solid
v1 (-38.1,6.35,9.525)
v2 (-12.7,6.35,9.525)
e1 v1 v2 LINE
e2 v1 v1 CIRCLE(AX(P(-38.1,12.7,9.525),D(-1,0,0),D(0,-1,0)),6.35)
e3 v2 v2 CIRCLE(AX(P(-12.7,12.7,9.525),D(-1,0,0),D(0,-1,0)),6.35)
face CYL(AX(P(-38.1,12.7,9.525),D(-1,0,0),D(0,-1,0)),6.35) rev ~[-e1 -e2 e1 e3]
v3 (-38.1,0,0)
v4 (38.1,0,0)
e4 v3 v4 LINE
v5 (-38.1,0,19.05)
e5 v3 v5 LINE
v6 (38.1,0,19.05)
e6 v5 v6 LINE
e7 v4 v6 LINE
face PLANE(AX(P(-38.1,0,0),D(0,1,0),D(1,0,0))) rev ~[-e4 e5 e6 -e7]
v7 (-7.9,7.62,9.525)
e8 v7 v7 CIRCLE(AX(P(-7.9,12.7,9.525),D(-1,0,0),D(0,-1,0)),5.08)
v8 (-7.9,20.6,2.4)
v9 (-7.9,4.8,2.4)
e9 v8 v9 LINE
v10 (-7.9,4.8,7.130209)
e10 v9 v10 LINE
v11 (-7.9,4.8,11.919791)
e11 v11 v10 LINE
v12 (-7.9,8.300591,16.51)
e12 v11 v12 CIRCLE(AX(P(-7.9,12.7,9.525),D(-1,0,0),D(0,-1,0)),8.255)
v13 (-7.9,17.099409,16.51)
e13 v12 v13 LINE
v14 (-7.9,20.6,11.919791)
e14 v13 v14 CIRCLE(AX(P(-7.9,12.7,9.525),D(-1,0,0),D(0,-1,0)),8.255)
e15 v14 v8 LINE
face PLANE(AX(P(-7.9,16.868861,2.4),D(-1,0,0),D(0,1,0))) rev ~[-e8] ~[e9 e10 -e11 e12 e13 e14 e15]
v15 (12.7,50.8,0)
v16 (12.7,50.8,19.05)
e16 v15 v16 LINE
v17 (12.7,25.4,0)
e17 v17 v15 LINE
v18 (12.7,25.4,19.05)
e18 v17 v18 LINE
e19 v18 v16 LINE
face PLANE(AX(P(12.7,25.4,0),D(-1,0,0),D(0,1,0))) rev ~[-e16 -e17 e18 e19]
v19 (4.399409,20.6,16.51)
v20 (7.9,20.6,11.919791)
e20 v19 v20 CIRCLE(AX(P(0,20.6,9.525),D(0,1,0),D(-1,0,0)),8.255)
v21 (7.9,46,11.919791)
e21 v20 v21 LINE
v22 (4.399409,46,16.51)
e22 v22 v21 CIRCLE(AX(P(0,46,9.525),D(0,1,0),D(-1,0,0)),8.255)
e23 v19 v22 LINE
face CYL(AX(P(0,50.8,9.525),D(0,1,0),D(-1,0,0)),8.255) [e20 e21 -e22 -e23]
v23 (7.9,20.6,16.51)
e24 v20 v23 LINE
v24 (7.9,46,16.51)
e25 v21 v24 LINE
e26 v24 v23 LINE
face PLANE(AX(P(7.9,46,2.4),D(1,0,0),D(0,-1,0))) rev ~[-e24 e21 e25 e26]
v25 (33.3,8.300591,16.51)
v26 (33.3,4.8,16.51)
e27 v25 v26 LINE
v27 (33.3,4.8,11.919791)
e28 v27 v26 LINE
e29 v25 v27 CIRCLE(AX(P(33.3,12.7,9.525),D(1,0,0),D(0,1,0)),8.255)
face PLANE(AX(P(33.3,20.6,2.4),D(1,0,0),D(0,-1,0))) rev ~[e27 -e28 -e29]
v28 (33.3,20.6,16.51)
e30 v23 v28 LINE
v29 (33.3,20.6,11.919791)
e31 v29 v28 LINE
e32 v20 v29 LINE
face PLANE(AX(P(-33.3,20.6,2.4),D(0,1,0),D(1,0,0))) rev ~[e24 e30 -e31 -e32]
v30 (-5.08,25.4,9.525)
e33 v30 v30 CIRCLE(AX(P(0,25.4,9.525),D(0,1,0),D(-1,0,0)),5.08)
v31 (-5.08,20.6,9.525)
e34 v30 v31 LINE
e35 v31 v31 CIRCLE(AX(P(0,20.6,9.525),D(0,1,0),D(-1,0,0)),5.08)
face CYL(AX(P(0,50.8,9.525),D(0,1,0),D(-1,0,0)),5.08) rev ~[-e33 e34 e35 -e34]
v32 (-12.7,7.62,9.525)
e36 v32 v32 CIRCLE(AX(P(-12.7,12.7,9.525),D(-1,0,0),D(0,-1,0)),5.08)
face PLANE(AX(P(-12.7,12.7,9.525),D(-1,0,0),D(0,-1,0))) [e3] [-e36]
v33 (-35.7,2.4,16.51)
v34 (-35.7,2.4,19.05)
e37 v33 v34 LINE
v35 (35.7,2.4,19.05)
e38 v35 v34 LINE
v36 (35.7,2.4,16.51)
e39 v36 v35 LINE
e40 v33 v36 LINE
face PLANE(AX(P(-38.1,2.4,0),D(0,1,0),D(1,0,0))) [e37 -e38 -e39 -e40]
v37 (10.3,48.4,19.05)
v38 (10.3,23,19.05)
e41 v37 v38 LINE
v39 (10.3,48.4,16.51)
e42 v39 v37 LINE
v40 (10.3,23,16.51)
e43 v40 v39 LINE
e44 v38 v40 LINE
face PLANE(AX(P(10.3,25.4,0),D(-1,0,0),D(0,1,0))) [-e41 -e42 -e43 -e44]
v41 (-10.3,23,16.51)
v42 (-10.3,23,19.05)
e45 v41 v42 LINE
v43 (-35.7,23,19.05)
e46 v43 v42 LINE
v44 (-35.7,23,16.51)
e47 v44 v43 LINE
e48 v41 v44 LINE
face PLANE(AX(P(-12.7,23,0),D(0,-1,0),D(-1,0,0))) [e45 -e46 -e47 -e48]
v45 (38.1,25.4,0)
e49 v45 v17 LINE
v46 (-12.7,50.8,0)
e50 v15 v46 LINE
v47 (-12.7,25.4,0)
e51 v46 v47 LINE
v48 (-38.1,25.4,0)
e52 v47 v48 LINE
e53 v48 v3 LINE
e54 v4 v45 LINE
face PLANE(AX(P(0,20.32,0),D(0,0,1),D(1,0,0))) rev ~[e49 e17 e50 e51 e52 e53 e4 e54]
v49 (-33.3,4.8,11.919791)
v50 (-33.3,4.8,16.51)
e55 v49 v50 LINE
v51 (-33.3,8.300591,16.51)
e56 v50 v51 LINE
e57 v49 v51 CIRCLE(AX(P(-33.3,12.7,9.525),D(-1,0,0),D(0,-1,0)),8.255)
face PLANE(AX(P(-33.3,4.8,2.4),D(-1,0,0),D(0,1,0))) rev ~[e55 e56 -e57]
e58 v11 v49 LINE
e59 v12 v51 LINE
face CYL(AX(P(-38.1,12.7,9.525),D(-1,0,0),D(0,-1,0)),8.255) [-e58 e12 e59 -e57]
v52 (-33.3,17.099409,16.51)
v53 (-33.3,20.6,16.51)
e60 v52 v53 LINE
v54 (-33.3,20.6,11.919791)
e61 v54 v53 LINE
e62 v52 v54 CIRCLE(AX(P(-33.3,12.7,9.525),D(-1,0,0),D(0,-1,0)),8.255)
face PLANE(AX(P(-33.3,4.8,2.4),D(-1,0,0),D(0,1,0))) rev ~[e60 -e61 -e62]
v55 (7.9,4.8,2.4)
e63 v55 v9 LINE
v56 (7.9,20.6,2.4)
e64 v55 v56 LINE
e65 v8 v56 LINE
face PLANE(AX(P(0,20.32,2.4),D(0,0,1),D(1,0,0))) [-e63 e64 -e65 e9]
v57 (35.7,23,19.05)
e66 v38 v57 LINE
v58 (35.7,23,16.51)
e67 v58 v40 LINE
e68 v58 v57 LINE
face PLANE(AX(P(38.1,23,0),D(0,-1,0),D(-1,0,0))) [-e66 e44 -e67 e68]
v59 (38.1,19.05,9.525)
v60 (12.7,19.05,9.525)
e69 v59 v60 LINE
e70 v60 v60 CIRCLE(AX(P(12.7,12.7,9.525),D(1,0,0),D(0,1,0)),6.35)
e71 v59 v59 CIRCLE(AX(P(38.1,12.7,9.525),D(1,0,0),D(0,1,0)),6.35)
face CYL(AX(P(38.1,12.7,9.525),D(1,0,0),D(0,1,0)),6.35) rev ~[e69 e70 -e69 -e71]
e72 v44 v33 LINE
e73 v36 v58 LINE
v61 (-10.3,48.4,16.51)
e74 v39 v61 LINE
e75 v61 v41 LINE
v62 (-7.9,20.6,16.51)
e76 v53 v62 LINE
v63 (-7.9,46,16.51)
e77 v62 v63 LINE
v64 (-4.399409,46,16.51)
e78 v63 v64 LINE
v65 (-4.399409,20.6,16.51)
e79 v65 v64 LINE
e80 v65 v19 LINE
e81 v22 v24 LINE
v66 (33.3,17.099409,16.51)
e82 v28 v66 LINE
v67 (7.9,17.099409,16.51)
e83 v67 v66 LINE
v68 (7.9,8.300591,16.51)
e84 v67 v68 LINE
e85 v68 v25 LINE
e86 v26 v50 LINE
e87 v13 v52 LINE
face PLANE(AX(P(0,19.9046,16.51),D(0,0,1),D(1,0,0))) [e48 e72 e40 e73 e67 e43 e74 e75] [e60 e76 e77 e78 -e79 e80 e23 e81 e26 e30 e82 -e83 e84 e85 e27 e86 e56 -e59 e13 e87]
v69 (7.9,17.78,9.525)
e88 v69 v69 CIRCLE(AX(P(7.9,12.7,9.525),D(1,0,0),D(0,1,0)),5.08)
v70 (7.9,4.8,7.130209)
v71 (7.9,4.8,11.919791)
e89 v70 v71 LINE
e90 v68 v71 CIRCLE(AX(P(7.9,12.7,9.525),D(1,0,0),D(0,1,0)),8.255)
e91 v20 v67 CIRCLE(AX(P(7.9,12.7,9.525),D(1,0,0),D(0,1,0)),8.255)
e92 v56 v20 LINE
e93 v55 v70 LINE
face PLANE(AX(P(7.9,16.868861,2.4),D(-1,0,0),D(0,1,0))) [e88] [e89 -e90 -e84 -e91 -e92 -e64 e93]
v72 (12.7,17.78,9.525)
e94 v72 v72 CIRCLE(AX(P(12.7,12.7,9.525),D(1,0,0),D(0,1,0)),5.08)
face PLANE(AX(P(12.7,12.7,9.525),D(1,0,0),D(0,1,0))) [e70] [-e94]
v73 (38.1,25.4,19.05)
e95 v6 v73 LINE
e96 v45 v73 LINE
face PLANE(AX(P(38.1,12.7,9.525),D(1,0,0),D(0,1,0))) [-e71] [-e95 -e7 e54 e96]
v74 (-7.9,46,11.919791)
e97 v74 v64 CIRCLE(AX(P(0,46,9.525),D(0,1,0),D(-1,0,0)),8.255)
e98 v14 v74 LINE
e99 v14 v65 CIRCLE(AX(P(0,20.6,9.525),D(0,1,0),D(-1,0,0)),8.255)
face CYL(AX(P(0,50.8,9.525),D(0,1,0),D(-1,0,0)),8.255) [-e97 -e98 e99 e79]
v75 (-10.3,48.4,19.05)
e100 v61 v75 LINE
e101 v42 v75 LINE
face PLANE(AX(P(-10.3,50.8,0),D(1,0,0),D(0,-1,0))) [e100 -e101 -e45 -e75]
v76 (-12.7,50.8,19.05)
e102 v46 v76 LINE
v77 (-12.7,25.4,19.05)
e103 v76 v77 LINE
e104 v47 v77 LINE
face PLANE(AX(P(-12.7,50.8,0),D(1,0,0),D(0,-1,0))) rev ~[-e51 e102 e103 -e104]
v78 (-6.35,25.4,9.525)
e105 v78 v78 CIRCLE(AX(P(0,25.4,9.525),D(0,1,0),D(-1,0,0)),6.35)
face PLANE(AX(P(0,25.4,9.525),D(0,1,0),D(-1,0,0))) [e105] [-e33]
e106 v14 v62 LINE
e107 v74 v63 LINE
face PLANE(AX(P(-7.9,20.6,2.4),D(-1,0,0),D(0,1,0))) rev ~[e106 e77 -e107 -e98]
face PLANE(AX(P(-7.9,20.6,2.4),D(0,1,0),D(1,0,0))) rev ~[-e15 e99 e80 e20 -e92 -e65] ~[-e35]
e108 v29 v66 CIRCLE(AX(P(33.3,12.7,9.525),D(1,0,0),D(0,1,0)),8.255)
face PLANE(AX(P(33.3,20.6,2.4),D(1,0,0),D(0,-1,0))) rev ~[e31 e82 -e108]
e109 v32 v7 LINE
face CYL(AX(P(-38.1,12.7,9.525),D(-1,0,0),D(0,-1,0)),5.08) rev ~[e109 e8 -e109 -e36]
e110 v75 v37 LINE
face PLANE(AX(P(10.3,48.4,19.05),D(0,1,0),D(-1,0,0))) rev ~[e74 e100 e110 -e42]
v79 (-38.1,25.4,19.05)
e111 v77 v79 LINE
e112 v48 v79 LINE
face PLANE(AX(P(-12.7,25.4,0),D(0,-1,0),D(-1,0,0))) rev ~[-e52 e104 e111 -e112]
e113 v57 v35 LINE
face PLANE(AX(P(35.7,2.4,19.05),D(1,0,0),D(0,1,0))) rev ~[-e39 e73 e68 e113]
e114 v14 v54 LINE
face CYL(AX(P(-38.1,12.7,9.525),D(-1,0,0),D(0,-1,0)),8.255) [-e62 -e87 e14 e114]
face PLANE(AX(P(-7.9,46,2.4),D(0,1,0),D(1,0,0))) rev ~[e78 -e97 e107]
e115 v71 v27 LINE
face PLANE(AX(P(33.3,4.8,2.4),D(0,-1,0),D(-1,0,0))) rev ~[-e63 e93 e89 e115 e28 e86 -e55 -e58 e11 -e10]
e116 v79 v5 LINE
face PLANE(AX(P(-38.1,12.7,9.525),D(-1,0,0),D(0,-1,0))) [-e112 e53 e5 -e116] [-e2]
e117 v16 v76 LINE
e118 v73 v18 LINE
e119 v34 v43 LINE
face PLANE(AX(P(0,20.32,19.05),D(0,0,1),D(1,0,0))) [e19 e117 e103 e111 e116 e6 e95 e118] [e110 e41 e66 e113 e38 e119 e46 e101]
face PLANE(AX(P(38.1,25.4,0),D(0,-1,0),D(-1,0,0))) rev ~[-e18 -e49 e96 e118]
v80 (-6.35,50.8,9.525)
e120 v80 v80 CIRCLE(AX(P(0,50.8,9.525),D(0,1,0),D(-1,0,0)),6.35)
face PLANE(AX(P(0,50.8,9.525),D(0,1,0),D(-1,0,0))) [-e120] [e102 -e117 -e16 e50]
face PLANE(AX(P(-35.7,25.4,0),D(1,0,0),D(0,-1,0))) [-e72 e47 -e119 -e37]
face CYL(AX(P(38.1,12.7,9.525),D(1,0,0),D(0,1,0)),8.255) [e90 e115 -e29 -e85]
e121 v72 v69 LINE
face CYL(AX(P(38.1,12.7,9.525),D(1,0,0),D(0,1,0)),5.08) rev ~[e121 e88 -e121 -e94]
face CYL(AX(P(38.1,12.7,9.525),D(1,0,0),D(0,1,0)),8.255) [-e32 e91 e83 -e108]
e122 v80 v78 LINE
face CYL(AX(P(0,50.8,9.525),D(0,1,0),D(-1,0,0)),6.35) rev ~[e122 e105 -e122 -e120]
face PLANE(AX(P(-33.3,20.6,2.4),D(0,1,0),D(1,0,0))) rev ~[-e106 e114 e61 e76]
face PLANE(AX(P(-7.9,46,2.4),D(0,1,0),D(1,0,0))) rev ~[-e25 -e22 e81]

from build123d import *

# Parameters (mm, degrees)
F1_DEPTH  = 19.05
F2_T      = -2.4
F4_DEPTH  = 14.11
F5_R      = 8.255
F5_R_2    = 6.35
F5_R_3    = 5.08
F6_DEPTH  = 30.2
F7_DEPTH  = 25.4
F8_DEPTH  = 34.5948
F9_R      = 8.255
F9_R_2    = 6.35
F9_R_3    = 5.08
F10_DEPTH = 30.2
F11_DEPTH = 25.4
F12_DEPTH = 36.9316
F13_R     = 8.255
F13_R_2   = 6.35
F13_R_3   = 5.08
F14_DEPTH = 30.2
F15_DEPTH = 25.4
F16_DEPTH = 31.242
F17_W     = 3.7311392443
F17_H     = 25.4
F17_W_2   = 25.4
F17_H_2   = 3.7311392443
F20_DEPTH = 2.54


with BuildPart() as f1:
    # F0 (on Top) → F1 (new body)
    with BuildSketch(Plane.XY):
        Polygon((-12.7, 25.4), (-38.1, 25.4), (-38.1, 0), (38.1, 0), (38.1, 25.4), (12.7, 25.4), (12.7, 50.8), (-12.7, 50.8), align=None)
    extrude(amount=F1_DEPTH)

    # F2
    f2_openings = [f1.faces().sort_by_distance(p)[0] for p in [
        (0, 19.05, 19.05),
    ]]
    offset(amount=F2_T, openings=f2_openings, kind=Kind.INTERSECTION)

    # F3 (on face) → F4 (join, through all)
    with BuildSketch(Plane.XY.offset(2.4)):
        Polygon((10.3, 48.4), (-10.3, 48.4), (-10.3, 23), (-35.7, 23), (-35.7, 2.4), (35.7, 2.4), (35.7, 23), (10.3, 23), align=None)
        Polygon((-33.3, 4.8), (-33.3, 20.6), (-7.9, 20.6), (-7.9, 46), (7.9, 46), (7.9, 20.6), (33.3, 20.6), (33.3, 4.8), align=None, mode=Mode.SUBTRACT)
    extrude(amount=F4_DEPTH)

    # F5 (on face) → F6 (join, through all)
    with BuildSketch(Plane(origin=(0, 50.8, 0), x_dir=(-1, 0, 0), z_dir=(0, 1, 0))):
        with Locations((0, 9.525)):
            Circle(F5_R)
        with Locations((0, 9.525)):
            Circle(F5_R_2, mode=Mode.SUBTRACT)
        with Locations((0, 9.525)):
            Circle(F5_R_2)
        with Locations((0, 9.525)):
            Circle(F5_R_3, mode=Mode.SUBTRACT)
        with Locations((0, 9.525)):
            Circle(F5_R_3)
    extrude(amount=-F6_DEPTH)

    # F5 (on face) → F7 (cut)
    with BuildSketch(Plane(origin=(0, 50.8, 0), x_dir=(-1, 0, 0), z_dir=(0, 1, 0))):
        with Locations((0, 9.525)):
            Circle(F5_R_2)
        with Locations((0, 9.525)):
            Circle(F5_R_3, mode=Mode.SUBTRACT)
        with Locations((0, 9.525)):
            Circle(F5_R_3)
    extrude(amount=-F7_DEPTH, mode=Mode.SUBTRACT)

    # F5 (on face) → F8 (cut)
    with BuildSketch(Plane(origin=(0, 50.8, 0), x_dir=(-1, 0, 0), z_dir=(0, 1, 0))):
        with Locations((0, 9.525)):
            Circle(F5_R_3)
    extrude(amount=-F8_DEPTH, mode=Mode.SUBTRACT)

    # F9 (on face) → F10 (join, through all)
    with BuildSketch(Plane.YZ.offset(38.1)):
        with Locations((12.7, 9.525)):
            Circle(F9_R)
        with Locations((12.7, 9.525)):
            Circle(F9_R_2, mode=Mode.SUBTRACT)
        with Locations((12.7, 9.525)):
            Circle(F9_R_2)
        with Locations((12.7, 9.525)):
            Circle(F9_R_3, mode=Mode.SUBTRACT)
        with Locations((12.7, 9.525)):
            Circle(F9_R_3)
    extrude(amount=-F10_DEPTH)

    # F9 (on face) → F11 (cut)
    with BuildSketch(Plane.YZ.offset(38.1)):
        with Locations((12.7, 9.525)):
            Circle(F9_R_2)
        with Locations((12.7, 9.525)):
            Circle(F9_R_3, mode=Mode.SUBTRACT)
    extrude(amount=-F11_DEPTH, mode=Mode.SUBTRACT)

    # F9 (on face) → F12 (cut)
    with BuildSketch(Plane.YZ.offset(38.1)):
        with Locations((12.7, 9.525)):
            Circle(F9_R_3)
    extrude(amount=-F12_DEPTH, mode=Mode.SUBTRACT)

    # F13 (on face) → F14 (join, through all)
    with BuildSketch(Plane(origin=(-38.1, 0, 0), x_dir=(0, -1, 0), z_dir=(-1, 0, 0))):
        with Locations((-12.7, 9.525)):
            Circle(F13_R)
        with Locations((-12.7, 9.525)):
            Circle(F13_R_2, mode=Mode.SUBTRACT)
        with Locations((-12.7, 9.525)):
            Circle(F13_R_2)
        with Locations((-12.7, 9.525)):
            Circle(F13_R_3, mode=Mode.SUBTRACT)
        with Locations((-12.7, 9.525)):
            Circle(F13_R_3)
    extrude(amount=-F14_DEPTH)

    # F13 (on face) → F15 (cut)
    with BuildSketch(Plane(origin=(-38.1, 0, 0), x_dir=(0, -1, 0), z_dir=(-1, 0, 0))):
        with Locations((-12.7, 9.525)):
            Circle(F13_R_2)
        with Locations((-12.7, 9.525)):
            Circle(F13_R_3, mode=Mode.SUBTRACT)
        with Locations((-12.7, 9.525)):
            Circle(F13_R_3)
    extrude(amount=-F15_DEPTH, mode=Mode.SUBTRACT)

    # F13 (on face) → F16 (cut)
    with BuildSketch(Plane(origin=(-38.1, 0, 0), x_dir=(0, -1, 0), z_dir=(-1, 0, 0))):
        with Locations((-12.7, 9.525)):
            Circle(F13_R_3)
    extrude(amount=-F16_DEPTH, mode=Mode.SUBTRACT)

    # F17 (on face) → F18 (join, up to the next surface of F1)
    with BuildSketch(Plane.XY.offset(2.4)):
        with Locations((-6.0344303778, 33.3)):
            Rectangle(F17_W, F17_H)
        with Locations((-20.6, 18.7344303778)):
            Rectangle(F17_W_2, F17_H_2)
        with Locations((6.0344303778, 33.3)):
            Rectangle(F17_W, F17_H)
        with Locations((-20.6, 6.6655696222)):
            Rectangle(F17_W_2, F17_H_2)
        with Locations((20.6, 18.7344303778)):
            Rectangle(F17_W_2, F17_H_2)
        with Locations((20.6, 6.6655696222)):
            Rectangle(F17_W_2, F17_H_2)
    extrude(until=Until.NEXT)

    # F19 (on face) → F20 (cut, through all)
    with BuildSketch(Plane.XY.offset(19.05)):
        Polygon((-10.3, 23), (-35.7, 23), (-35.7, 2.4), (35.7, 2.4), (35.7, 23), (10.3, 23), (10.3, 48.4), (-10.3, 48.4), align=None)
        Polygon((7.9, 46), (7.9, 20.6), (33.3, 20.6), (33.3, 17.0994090512), (33.3, 8.3005909488), (33.3, 4.8), (7.9, 4.8), (-7.9, 4.8), (-33.3, 4.8), (-33.3, 8.3005909488), (-33.3, 17.0994090512), (-33.3, 20.6), (-7.9, 20.6), (-7.9, 46), (-4.3994090512, 46), (4.3994090512, 46), align=None, mode=Mode.SUBTRACT)
        Polygon((-7.9, 20.6), (7.9, 20.6), (7.9, 46), (4.3994090512, 46), (-4.3994090512, 46), (-7.9, 46), align=None)
        Polygon((-7.9, 4.8), (-7.9, 20.6), (-33.3, 20.6), (-33.3, 17.0994090512), (-33.3, 8.3005909488), (-33.3, 4.8), align=None)
        Polygon((33.3, 20.6), (7.9, 20.6), (7.9, 4.8), (33.3, 4.8), (33.3, 8.3005909488), (33.3, 17.0994090512), align=None)
    extrude(amount=-F20_DEPTH, mode=Mode.SUBTRACT)


solid = f1.part
